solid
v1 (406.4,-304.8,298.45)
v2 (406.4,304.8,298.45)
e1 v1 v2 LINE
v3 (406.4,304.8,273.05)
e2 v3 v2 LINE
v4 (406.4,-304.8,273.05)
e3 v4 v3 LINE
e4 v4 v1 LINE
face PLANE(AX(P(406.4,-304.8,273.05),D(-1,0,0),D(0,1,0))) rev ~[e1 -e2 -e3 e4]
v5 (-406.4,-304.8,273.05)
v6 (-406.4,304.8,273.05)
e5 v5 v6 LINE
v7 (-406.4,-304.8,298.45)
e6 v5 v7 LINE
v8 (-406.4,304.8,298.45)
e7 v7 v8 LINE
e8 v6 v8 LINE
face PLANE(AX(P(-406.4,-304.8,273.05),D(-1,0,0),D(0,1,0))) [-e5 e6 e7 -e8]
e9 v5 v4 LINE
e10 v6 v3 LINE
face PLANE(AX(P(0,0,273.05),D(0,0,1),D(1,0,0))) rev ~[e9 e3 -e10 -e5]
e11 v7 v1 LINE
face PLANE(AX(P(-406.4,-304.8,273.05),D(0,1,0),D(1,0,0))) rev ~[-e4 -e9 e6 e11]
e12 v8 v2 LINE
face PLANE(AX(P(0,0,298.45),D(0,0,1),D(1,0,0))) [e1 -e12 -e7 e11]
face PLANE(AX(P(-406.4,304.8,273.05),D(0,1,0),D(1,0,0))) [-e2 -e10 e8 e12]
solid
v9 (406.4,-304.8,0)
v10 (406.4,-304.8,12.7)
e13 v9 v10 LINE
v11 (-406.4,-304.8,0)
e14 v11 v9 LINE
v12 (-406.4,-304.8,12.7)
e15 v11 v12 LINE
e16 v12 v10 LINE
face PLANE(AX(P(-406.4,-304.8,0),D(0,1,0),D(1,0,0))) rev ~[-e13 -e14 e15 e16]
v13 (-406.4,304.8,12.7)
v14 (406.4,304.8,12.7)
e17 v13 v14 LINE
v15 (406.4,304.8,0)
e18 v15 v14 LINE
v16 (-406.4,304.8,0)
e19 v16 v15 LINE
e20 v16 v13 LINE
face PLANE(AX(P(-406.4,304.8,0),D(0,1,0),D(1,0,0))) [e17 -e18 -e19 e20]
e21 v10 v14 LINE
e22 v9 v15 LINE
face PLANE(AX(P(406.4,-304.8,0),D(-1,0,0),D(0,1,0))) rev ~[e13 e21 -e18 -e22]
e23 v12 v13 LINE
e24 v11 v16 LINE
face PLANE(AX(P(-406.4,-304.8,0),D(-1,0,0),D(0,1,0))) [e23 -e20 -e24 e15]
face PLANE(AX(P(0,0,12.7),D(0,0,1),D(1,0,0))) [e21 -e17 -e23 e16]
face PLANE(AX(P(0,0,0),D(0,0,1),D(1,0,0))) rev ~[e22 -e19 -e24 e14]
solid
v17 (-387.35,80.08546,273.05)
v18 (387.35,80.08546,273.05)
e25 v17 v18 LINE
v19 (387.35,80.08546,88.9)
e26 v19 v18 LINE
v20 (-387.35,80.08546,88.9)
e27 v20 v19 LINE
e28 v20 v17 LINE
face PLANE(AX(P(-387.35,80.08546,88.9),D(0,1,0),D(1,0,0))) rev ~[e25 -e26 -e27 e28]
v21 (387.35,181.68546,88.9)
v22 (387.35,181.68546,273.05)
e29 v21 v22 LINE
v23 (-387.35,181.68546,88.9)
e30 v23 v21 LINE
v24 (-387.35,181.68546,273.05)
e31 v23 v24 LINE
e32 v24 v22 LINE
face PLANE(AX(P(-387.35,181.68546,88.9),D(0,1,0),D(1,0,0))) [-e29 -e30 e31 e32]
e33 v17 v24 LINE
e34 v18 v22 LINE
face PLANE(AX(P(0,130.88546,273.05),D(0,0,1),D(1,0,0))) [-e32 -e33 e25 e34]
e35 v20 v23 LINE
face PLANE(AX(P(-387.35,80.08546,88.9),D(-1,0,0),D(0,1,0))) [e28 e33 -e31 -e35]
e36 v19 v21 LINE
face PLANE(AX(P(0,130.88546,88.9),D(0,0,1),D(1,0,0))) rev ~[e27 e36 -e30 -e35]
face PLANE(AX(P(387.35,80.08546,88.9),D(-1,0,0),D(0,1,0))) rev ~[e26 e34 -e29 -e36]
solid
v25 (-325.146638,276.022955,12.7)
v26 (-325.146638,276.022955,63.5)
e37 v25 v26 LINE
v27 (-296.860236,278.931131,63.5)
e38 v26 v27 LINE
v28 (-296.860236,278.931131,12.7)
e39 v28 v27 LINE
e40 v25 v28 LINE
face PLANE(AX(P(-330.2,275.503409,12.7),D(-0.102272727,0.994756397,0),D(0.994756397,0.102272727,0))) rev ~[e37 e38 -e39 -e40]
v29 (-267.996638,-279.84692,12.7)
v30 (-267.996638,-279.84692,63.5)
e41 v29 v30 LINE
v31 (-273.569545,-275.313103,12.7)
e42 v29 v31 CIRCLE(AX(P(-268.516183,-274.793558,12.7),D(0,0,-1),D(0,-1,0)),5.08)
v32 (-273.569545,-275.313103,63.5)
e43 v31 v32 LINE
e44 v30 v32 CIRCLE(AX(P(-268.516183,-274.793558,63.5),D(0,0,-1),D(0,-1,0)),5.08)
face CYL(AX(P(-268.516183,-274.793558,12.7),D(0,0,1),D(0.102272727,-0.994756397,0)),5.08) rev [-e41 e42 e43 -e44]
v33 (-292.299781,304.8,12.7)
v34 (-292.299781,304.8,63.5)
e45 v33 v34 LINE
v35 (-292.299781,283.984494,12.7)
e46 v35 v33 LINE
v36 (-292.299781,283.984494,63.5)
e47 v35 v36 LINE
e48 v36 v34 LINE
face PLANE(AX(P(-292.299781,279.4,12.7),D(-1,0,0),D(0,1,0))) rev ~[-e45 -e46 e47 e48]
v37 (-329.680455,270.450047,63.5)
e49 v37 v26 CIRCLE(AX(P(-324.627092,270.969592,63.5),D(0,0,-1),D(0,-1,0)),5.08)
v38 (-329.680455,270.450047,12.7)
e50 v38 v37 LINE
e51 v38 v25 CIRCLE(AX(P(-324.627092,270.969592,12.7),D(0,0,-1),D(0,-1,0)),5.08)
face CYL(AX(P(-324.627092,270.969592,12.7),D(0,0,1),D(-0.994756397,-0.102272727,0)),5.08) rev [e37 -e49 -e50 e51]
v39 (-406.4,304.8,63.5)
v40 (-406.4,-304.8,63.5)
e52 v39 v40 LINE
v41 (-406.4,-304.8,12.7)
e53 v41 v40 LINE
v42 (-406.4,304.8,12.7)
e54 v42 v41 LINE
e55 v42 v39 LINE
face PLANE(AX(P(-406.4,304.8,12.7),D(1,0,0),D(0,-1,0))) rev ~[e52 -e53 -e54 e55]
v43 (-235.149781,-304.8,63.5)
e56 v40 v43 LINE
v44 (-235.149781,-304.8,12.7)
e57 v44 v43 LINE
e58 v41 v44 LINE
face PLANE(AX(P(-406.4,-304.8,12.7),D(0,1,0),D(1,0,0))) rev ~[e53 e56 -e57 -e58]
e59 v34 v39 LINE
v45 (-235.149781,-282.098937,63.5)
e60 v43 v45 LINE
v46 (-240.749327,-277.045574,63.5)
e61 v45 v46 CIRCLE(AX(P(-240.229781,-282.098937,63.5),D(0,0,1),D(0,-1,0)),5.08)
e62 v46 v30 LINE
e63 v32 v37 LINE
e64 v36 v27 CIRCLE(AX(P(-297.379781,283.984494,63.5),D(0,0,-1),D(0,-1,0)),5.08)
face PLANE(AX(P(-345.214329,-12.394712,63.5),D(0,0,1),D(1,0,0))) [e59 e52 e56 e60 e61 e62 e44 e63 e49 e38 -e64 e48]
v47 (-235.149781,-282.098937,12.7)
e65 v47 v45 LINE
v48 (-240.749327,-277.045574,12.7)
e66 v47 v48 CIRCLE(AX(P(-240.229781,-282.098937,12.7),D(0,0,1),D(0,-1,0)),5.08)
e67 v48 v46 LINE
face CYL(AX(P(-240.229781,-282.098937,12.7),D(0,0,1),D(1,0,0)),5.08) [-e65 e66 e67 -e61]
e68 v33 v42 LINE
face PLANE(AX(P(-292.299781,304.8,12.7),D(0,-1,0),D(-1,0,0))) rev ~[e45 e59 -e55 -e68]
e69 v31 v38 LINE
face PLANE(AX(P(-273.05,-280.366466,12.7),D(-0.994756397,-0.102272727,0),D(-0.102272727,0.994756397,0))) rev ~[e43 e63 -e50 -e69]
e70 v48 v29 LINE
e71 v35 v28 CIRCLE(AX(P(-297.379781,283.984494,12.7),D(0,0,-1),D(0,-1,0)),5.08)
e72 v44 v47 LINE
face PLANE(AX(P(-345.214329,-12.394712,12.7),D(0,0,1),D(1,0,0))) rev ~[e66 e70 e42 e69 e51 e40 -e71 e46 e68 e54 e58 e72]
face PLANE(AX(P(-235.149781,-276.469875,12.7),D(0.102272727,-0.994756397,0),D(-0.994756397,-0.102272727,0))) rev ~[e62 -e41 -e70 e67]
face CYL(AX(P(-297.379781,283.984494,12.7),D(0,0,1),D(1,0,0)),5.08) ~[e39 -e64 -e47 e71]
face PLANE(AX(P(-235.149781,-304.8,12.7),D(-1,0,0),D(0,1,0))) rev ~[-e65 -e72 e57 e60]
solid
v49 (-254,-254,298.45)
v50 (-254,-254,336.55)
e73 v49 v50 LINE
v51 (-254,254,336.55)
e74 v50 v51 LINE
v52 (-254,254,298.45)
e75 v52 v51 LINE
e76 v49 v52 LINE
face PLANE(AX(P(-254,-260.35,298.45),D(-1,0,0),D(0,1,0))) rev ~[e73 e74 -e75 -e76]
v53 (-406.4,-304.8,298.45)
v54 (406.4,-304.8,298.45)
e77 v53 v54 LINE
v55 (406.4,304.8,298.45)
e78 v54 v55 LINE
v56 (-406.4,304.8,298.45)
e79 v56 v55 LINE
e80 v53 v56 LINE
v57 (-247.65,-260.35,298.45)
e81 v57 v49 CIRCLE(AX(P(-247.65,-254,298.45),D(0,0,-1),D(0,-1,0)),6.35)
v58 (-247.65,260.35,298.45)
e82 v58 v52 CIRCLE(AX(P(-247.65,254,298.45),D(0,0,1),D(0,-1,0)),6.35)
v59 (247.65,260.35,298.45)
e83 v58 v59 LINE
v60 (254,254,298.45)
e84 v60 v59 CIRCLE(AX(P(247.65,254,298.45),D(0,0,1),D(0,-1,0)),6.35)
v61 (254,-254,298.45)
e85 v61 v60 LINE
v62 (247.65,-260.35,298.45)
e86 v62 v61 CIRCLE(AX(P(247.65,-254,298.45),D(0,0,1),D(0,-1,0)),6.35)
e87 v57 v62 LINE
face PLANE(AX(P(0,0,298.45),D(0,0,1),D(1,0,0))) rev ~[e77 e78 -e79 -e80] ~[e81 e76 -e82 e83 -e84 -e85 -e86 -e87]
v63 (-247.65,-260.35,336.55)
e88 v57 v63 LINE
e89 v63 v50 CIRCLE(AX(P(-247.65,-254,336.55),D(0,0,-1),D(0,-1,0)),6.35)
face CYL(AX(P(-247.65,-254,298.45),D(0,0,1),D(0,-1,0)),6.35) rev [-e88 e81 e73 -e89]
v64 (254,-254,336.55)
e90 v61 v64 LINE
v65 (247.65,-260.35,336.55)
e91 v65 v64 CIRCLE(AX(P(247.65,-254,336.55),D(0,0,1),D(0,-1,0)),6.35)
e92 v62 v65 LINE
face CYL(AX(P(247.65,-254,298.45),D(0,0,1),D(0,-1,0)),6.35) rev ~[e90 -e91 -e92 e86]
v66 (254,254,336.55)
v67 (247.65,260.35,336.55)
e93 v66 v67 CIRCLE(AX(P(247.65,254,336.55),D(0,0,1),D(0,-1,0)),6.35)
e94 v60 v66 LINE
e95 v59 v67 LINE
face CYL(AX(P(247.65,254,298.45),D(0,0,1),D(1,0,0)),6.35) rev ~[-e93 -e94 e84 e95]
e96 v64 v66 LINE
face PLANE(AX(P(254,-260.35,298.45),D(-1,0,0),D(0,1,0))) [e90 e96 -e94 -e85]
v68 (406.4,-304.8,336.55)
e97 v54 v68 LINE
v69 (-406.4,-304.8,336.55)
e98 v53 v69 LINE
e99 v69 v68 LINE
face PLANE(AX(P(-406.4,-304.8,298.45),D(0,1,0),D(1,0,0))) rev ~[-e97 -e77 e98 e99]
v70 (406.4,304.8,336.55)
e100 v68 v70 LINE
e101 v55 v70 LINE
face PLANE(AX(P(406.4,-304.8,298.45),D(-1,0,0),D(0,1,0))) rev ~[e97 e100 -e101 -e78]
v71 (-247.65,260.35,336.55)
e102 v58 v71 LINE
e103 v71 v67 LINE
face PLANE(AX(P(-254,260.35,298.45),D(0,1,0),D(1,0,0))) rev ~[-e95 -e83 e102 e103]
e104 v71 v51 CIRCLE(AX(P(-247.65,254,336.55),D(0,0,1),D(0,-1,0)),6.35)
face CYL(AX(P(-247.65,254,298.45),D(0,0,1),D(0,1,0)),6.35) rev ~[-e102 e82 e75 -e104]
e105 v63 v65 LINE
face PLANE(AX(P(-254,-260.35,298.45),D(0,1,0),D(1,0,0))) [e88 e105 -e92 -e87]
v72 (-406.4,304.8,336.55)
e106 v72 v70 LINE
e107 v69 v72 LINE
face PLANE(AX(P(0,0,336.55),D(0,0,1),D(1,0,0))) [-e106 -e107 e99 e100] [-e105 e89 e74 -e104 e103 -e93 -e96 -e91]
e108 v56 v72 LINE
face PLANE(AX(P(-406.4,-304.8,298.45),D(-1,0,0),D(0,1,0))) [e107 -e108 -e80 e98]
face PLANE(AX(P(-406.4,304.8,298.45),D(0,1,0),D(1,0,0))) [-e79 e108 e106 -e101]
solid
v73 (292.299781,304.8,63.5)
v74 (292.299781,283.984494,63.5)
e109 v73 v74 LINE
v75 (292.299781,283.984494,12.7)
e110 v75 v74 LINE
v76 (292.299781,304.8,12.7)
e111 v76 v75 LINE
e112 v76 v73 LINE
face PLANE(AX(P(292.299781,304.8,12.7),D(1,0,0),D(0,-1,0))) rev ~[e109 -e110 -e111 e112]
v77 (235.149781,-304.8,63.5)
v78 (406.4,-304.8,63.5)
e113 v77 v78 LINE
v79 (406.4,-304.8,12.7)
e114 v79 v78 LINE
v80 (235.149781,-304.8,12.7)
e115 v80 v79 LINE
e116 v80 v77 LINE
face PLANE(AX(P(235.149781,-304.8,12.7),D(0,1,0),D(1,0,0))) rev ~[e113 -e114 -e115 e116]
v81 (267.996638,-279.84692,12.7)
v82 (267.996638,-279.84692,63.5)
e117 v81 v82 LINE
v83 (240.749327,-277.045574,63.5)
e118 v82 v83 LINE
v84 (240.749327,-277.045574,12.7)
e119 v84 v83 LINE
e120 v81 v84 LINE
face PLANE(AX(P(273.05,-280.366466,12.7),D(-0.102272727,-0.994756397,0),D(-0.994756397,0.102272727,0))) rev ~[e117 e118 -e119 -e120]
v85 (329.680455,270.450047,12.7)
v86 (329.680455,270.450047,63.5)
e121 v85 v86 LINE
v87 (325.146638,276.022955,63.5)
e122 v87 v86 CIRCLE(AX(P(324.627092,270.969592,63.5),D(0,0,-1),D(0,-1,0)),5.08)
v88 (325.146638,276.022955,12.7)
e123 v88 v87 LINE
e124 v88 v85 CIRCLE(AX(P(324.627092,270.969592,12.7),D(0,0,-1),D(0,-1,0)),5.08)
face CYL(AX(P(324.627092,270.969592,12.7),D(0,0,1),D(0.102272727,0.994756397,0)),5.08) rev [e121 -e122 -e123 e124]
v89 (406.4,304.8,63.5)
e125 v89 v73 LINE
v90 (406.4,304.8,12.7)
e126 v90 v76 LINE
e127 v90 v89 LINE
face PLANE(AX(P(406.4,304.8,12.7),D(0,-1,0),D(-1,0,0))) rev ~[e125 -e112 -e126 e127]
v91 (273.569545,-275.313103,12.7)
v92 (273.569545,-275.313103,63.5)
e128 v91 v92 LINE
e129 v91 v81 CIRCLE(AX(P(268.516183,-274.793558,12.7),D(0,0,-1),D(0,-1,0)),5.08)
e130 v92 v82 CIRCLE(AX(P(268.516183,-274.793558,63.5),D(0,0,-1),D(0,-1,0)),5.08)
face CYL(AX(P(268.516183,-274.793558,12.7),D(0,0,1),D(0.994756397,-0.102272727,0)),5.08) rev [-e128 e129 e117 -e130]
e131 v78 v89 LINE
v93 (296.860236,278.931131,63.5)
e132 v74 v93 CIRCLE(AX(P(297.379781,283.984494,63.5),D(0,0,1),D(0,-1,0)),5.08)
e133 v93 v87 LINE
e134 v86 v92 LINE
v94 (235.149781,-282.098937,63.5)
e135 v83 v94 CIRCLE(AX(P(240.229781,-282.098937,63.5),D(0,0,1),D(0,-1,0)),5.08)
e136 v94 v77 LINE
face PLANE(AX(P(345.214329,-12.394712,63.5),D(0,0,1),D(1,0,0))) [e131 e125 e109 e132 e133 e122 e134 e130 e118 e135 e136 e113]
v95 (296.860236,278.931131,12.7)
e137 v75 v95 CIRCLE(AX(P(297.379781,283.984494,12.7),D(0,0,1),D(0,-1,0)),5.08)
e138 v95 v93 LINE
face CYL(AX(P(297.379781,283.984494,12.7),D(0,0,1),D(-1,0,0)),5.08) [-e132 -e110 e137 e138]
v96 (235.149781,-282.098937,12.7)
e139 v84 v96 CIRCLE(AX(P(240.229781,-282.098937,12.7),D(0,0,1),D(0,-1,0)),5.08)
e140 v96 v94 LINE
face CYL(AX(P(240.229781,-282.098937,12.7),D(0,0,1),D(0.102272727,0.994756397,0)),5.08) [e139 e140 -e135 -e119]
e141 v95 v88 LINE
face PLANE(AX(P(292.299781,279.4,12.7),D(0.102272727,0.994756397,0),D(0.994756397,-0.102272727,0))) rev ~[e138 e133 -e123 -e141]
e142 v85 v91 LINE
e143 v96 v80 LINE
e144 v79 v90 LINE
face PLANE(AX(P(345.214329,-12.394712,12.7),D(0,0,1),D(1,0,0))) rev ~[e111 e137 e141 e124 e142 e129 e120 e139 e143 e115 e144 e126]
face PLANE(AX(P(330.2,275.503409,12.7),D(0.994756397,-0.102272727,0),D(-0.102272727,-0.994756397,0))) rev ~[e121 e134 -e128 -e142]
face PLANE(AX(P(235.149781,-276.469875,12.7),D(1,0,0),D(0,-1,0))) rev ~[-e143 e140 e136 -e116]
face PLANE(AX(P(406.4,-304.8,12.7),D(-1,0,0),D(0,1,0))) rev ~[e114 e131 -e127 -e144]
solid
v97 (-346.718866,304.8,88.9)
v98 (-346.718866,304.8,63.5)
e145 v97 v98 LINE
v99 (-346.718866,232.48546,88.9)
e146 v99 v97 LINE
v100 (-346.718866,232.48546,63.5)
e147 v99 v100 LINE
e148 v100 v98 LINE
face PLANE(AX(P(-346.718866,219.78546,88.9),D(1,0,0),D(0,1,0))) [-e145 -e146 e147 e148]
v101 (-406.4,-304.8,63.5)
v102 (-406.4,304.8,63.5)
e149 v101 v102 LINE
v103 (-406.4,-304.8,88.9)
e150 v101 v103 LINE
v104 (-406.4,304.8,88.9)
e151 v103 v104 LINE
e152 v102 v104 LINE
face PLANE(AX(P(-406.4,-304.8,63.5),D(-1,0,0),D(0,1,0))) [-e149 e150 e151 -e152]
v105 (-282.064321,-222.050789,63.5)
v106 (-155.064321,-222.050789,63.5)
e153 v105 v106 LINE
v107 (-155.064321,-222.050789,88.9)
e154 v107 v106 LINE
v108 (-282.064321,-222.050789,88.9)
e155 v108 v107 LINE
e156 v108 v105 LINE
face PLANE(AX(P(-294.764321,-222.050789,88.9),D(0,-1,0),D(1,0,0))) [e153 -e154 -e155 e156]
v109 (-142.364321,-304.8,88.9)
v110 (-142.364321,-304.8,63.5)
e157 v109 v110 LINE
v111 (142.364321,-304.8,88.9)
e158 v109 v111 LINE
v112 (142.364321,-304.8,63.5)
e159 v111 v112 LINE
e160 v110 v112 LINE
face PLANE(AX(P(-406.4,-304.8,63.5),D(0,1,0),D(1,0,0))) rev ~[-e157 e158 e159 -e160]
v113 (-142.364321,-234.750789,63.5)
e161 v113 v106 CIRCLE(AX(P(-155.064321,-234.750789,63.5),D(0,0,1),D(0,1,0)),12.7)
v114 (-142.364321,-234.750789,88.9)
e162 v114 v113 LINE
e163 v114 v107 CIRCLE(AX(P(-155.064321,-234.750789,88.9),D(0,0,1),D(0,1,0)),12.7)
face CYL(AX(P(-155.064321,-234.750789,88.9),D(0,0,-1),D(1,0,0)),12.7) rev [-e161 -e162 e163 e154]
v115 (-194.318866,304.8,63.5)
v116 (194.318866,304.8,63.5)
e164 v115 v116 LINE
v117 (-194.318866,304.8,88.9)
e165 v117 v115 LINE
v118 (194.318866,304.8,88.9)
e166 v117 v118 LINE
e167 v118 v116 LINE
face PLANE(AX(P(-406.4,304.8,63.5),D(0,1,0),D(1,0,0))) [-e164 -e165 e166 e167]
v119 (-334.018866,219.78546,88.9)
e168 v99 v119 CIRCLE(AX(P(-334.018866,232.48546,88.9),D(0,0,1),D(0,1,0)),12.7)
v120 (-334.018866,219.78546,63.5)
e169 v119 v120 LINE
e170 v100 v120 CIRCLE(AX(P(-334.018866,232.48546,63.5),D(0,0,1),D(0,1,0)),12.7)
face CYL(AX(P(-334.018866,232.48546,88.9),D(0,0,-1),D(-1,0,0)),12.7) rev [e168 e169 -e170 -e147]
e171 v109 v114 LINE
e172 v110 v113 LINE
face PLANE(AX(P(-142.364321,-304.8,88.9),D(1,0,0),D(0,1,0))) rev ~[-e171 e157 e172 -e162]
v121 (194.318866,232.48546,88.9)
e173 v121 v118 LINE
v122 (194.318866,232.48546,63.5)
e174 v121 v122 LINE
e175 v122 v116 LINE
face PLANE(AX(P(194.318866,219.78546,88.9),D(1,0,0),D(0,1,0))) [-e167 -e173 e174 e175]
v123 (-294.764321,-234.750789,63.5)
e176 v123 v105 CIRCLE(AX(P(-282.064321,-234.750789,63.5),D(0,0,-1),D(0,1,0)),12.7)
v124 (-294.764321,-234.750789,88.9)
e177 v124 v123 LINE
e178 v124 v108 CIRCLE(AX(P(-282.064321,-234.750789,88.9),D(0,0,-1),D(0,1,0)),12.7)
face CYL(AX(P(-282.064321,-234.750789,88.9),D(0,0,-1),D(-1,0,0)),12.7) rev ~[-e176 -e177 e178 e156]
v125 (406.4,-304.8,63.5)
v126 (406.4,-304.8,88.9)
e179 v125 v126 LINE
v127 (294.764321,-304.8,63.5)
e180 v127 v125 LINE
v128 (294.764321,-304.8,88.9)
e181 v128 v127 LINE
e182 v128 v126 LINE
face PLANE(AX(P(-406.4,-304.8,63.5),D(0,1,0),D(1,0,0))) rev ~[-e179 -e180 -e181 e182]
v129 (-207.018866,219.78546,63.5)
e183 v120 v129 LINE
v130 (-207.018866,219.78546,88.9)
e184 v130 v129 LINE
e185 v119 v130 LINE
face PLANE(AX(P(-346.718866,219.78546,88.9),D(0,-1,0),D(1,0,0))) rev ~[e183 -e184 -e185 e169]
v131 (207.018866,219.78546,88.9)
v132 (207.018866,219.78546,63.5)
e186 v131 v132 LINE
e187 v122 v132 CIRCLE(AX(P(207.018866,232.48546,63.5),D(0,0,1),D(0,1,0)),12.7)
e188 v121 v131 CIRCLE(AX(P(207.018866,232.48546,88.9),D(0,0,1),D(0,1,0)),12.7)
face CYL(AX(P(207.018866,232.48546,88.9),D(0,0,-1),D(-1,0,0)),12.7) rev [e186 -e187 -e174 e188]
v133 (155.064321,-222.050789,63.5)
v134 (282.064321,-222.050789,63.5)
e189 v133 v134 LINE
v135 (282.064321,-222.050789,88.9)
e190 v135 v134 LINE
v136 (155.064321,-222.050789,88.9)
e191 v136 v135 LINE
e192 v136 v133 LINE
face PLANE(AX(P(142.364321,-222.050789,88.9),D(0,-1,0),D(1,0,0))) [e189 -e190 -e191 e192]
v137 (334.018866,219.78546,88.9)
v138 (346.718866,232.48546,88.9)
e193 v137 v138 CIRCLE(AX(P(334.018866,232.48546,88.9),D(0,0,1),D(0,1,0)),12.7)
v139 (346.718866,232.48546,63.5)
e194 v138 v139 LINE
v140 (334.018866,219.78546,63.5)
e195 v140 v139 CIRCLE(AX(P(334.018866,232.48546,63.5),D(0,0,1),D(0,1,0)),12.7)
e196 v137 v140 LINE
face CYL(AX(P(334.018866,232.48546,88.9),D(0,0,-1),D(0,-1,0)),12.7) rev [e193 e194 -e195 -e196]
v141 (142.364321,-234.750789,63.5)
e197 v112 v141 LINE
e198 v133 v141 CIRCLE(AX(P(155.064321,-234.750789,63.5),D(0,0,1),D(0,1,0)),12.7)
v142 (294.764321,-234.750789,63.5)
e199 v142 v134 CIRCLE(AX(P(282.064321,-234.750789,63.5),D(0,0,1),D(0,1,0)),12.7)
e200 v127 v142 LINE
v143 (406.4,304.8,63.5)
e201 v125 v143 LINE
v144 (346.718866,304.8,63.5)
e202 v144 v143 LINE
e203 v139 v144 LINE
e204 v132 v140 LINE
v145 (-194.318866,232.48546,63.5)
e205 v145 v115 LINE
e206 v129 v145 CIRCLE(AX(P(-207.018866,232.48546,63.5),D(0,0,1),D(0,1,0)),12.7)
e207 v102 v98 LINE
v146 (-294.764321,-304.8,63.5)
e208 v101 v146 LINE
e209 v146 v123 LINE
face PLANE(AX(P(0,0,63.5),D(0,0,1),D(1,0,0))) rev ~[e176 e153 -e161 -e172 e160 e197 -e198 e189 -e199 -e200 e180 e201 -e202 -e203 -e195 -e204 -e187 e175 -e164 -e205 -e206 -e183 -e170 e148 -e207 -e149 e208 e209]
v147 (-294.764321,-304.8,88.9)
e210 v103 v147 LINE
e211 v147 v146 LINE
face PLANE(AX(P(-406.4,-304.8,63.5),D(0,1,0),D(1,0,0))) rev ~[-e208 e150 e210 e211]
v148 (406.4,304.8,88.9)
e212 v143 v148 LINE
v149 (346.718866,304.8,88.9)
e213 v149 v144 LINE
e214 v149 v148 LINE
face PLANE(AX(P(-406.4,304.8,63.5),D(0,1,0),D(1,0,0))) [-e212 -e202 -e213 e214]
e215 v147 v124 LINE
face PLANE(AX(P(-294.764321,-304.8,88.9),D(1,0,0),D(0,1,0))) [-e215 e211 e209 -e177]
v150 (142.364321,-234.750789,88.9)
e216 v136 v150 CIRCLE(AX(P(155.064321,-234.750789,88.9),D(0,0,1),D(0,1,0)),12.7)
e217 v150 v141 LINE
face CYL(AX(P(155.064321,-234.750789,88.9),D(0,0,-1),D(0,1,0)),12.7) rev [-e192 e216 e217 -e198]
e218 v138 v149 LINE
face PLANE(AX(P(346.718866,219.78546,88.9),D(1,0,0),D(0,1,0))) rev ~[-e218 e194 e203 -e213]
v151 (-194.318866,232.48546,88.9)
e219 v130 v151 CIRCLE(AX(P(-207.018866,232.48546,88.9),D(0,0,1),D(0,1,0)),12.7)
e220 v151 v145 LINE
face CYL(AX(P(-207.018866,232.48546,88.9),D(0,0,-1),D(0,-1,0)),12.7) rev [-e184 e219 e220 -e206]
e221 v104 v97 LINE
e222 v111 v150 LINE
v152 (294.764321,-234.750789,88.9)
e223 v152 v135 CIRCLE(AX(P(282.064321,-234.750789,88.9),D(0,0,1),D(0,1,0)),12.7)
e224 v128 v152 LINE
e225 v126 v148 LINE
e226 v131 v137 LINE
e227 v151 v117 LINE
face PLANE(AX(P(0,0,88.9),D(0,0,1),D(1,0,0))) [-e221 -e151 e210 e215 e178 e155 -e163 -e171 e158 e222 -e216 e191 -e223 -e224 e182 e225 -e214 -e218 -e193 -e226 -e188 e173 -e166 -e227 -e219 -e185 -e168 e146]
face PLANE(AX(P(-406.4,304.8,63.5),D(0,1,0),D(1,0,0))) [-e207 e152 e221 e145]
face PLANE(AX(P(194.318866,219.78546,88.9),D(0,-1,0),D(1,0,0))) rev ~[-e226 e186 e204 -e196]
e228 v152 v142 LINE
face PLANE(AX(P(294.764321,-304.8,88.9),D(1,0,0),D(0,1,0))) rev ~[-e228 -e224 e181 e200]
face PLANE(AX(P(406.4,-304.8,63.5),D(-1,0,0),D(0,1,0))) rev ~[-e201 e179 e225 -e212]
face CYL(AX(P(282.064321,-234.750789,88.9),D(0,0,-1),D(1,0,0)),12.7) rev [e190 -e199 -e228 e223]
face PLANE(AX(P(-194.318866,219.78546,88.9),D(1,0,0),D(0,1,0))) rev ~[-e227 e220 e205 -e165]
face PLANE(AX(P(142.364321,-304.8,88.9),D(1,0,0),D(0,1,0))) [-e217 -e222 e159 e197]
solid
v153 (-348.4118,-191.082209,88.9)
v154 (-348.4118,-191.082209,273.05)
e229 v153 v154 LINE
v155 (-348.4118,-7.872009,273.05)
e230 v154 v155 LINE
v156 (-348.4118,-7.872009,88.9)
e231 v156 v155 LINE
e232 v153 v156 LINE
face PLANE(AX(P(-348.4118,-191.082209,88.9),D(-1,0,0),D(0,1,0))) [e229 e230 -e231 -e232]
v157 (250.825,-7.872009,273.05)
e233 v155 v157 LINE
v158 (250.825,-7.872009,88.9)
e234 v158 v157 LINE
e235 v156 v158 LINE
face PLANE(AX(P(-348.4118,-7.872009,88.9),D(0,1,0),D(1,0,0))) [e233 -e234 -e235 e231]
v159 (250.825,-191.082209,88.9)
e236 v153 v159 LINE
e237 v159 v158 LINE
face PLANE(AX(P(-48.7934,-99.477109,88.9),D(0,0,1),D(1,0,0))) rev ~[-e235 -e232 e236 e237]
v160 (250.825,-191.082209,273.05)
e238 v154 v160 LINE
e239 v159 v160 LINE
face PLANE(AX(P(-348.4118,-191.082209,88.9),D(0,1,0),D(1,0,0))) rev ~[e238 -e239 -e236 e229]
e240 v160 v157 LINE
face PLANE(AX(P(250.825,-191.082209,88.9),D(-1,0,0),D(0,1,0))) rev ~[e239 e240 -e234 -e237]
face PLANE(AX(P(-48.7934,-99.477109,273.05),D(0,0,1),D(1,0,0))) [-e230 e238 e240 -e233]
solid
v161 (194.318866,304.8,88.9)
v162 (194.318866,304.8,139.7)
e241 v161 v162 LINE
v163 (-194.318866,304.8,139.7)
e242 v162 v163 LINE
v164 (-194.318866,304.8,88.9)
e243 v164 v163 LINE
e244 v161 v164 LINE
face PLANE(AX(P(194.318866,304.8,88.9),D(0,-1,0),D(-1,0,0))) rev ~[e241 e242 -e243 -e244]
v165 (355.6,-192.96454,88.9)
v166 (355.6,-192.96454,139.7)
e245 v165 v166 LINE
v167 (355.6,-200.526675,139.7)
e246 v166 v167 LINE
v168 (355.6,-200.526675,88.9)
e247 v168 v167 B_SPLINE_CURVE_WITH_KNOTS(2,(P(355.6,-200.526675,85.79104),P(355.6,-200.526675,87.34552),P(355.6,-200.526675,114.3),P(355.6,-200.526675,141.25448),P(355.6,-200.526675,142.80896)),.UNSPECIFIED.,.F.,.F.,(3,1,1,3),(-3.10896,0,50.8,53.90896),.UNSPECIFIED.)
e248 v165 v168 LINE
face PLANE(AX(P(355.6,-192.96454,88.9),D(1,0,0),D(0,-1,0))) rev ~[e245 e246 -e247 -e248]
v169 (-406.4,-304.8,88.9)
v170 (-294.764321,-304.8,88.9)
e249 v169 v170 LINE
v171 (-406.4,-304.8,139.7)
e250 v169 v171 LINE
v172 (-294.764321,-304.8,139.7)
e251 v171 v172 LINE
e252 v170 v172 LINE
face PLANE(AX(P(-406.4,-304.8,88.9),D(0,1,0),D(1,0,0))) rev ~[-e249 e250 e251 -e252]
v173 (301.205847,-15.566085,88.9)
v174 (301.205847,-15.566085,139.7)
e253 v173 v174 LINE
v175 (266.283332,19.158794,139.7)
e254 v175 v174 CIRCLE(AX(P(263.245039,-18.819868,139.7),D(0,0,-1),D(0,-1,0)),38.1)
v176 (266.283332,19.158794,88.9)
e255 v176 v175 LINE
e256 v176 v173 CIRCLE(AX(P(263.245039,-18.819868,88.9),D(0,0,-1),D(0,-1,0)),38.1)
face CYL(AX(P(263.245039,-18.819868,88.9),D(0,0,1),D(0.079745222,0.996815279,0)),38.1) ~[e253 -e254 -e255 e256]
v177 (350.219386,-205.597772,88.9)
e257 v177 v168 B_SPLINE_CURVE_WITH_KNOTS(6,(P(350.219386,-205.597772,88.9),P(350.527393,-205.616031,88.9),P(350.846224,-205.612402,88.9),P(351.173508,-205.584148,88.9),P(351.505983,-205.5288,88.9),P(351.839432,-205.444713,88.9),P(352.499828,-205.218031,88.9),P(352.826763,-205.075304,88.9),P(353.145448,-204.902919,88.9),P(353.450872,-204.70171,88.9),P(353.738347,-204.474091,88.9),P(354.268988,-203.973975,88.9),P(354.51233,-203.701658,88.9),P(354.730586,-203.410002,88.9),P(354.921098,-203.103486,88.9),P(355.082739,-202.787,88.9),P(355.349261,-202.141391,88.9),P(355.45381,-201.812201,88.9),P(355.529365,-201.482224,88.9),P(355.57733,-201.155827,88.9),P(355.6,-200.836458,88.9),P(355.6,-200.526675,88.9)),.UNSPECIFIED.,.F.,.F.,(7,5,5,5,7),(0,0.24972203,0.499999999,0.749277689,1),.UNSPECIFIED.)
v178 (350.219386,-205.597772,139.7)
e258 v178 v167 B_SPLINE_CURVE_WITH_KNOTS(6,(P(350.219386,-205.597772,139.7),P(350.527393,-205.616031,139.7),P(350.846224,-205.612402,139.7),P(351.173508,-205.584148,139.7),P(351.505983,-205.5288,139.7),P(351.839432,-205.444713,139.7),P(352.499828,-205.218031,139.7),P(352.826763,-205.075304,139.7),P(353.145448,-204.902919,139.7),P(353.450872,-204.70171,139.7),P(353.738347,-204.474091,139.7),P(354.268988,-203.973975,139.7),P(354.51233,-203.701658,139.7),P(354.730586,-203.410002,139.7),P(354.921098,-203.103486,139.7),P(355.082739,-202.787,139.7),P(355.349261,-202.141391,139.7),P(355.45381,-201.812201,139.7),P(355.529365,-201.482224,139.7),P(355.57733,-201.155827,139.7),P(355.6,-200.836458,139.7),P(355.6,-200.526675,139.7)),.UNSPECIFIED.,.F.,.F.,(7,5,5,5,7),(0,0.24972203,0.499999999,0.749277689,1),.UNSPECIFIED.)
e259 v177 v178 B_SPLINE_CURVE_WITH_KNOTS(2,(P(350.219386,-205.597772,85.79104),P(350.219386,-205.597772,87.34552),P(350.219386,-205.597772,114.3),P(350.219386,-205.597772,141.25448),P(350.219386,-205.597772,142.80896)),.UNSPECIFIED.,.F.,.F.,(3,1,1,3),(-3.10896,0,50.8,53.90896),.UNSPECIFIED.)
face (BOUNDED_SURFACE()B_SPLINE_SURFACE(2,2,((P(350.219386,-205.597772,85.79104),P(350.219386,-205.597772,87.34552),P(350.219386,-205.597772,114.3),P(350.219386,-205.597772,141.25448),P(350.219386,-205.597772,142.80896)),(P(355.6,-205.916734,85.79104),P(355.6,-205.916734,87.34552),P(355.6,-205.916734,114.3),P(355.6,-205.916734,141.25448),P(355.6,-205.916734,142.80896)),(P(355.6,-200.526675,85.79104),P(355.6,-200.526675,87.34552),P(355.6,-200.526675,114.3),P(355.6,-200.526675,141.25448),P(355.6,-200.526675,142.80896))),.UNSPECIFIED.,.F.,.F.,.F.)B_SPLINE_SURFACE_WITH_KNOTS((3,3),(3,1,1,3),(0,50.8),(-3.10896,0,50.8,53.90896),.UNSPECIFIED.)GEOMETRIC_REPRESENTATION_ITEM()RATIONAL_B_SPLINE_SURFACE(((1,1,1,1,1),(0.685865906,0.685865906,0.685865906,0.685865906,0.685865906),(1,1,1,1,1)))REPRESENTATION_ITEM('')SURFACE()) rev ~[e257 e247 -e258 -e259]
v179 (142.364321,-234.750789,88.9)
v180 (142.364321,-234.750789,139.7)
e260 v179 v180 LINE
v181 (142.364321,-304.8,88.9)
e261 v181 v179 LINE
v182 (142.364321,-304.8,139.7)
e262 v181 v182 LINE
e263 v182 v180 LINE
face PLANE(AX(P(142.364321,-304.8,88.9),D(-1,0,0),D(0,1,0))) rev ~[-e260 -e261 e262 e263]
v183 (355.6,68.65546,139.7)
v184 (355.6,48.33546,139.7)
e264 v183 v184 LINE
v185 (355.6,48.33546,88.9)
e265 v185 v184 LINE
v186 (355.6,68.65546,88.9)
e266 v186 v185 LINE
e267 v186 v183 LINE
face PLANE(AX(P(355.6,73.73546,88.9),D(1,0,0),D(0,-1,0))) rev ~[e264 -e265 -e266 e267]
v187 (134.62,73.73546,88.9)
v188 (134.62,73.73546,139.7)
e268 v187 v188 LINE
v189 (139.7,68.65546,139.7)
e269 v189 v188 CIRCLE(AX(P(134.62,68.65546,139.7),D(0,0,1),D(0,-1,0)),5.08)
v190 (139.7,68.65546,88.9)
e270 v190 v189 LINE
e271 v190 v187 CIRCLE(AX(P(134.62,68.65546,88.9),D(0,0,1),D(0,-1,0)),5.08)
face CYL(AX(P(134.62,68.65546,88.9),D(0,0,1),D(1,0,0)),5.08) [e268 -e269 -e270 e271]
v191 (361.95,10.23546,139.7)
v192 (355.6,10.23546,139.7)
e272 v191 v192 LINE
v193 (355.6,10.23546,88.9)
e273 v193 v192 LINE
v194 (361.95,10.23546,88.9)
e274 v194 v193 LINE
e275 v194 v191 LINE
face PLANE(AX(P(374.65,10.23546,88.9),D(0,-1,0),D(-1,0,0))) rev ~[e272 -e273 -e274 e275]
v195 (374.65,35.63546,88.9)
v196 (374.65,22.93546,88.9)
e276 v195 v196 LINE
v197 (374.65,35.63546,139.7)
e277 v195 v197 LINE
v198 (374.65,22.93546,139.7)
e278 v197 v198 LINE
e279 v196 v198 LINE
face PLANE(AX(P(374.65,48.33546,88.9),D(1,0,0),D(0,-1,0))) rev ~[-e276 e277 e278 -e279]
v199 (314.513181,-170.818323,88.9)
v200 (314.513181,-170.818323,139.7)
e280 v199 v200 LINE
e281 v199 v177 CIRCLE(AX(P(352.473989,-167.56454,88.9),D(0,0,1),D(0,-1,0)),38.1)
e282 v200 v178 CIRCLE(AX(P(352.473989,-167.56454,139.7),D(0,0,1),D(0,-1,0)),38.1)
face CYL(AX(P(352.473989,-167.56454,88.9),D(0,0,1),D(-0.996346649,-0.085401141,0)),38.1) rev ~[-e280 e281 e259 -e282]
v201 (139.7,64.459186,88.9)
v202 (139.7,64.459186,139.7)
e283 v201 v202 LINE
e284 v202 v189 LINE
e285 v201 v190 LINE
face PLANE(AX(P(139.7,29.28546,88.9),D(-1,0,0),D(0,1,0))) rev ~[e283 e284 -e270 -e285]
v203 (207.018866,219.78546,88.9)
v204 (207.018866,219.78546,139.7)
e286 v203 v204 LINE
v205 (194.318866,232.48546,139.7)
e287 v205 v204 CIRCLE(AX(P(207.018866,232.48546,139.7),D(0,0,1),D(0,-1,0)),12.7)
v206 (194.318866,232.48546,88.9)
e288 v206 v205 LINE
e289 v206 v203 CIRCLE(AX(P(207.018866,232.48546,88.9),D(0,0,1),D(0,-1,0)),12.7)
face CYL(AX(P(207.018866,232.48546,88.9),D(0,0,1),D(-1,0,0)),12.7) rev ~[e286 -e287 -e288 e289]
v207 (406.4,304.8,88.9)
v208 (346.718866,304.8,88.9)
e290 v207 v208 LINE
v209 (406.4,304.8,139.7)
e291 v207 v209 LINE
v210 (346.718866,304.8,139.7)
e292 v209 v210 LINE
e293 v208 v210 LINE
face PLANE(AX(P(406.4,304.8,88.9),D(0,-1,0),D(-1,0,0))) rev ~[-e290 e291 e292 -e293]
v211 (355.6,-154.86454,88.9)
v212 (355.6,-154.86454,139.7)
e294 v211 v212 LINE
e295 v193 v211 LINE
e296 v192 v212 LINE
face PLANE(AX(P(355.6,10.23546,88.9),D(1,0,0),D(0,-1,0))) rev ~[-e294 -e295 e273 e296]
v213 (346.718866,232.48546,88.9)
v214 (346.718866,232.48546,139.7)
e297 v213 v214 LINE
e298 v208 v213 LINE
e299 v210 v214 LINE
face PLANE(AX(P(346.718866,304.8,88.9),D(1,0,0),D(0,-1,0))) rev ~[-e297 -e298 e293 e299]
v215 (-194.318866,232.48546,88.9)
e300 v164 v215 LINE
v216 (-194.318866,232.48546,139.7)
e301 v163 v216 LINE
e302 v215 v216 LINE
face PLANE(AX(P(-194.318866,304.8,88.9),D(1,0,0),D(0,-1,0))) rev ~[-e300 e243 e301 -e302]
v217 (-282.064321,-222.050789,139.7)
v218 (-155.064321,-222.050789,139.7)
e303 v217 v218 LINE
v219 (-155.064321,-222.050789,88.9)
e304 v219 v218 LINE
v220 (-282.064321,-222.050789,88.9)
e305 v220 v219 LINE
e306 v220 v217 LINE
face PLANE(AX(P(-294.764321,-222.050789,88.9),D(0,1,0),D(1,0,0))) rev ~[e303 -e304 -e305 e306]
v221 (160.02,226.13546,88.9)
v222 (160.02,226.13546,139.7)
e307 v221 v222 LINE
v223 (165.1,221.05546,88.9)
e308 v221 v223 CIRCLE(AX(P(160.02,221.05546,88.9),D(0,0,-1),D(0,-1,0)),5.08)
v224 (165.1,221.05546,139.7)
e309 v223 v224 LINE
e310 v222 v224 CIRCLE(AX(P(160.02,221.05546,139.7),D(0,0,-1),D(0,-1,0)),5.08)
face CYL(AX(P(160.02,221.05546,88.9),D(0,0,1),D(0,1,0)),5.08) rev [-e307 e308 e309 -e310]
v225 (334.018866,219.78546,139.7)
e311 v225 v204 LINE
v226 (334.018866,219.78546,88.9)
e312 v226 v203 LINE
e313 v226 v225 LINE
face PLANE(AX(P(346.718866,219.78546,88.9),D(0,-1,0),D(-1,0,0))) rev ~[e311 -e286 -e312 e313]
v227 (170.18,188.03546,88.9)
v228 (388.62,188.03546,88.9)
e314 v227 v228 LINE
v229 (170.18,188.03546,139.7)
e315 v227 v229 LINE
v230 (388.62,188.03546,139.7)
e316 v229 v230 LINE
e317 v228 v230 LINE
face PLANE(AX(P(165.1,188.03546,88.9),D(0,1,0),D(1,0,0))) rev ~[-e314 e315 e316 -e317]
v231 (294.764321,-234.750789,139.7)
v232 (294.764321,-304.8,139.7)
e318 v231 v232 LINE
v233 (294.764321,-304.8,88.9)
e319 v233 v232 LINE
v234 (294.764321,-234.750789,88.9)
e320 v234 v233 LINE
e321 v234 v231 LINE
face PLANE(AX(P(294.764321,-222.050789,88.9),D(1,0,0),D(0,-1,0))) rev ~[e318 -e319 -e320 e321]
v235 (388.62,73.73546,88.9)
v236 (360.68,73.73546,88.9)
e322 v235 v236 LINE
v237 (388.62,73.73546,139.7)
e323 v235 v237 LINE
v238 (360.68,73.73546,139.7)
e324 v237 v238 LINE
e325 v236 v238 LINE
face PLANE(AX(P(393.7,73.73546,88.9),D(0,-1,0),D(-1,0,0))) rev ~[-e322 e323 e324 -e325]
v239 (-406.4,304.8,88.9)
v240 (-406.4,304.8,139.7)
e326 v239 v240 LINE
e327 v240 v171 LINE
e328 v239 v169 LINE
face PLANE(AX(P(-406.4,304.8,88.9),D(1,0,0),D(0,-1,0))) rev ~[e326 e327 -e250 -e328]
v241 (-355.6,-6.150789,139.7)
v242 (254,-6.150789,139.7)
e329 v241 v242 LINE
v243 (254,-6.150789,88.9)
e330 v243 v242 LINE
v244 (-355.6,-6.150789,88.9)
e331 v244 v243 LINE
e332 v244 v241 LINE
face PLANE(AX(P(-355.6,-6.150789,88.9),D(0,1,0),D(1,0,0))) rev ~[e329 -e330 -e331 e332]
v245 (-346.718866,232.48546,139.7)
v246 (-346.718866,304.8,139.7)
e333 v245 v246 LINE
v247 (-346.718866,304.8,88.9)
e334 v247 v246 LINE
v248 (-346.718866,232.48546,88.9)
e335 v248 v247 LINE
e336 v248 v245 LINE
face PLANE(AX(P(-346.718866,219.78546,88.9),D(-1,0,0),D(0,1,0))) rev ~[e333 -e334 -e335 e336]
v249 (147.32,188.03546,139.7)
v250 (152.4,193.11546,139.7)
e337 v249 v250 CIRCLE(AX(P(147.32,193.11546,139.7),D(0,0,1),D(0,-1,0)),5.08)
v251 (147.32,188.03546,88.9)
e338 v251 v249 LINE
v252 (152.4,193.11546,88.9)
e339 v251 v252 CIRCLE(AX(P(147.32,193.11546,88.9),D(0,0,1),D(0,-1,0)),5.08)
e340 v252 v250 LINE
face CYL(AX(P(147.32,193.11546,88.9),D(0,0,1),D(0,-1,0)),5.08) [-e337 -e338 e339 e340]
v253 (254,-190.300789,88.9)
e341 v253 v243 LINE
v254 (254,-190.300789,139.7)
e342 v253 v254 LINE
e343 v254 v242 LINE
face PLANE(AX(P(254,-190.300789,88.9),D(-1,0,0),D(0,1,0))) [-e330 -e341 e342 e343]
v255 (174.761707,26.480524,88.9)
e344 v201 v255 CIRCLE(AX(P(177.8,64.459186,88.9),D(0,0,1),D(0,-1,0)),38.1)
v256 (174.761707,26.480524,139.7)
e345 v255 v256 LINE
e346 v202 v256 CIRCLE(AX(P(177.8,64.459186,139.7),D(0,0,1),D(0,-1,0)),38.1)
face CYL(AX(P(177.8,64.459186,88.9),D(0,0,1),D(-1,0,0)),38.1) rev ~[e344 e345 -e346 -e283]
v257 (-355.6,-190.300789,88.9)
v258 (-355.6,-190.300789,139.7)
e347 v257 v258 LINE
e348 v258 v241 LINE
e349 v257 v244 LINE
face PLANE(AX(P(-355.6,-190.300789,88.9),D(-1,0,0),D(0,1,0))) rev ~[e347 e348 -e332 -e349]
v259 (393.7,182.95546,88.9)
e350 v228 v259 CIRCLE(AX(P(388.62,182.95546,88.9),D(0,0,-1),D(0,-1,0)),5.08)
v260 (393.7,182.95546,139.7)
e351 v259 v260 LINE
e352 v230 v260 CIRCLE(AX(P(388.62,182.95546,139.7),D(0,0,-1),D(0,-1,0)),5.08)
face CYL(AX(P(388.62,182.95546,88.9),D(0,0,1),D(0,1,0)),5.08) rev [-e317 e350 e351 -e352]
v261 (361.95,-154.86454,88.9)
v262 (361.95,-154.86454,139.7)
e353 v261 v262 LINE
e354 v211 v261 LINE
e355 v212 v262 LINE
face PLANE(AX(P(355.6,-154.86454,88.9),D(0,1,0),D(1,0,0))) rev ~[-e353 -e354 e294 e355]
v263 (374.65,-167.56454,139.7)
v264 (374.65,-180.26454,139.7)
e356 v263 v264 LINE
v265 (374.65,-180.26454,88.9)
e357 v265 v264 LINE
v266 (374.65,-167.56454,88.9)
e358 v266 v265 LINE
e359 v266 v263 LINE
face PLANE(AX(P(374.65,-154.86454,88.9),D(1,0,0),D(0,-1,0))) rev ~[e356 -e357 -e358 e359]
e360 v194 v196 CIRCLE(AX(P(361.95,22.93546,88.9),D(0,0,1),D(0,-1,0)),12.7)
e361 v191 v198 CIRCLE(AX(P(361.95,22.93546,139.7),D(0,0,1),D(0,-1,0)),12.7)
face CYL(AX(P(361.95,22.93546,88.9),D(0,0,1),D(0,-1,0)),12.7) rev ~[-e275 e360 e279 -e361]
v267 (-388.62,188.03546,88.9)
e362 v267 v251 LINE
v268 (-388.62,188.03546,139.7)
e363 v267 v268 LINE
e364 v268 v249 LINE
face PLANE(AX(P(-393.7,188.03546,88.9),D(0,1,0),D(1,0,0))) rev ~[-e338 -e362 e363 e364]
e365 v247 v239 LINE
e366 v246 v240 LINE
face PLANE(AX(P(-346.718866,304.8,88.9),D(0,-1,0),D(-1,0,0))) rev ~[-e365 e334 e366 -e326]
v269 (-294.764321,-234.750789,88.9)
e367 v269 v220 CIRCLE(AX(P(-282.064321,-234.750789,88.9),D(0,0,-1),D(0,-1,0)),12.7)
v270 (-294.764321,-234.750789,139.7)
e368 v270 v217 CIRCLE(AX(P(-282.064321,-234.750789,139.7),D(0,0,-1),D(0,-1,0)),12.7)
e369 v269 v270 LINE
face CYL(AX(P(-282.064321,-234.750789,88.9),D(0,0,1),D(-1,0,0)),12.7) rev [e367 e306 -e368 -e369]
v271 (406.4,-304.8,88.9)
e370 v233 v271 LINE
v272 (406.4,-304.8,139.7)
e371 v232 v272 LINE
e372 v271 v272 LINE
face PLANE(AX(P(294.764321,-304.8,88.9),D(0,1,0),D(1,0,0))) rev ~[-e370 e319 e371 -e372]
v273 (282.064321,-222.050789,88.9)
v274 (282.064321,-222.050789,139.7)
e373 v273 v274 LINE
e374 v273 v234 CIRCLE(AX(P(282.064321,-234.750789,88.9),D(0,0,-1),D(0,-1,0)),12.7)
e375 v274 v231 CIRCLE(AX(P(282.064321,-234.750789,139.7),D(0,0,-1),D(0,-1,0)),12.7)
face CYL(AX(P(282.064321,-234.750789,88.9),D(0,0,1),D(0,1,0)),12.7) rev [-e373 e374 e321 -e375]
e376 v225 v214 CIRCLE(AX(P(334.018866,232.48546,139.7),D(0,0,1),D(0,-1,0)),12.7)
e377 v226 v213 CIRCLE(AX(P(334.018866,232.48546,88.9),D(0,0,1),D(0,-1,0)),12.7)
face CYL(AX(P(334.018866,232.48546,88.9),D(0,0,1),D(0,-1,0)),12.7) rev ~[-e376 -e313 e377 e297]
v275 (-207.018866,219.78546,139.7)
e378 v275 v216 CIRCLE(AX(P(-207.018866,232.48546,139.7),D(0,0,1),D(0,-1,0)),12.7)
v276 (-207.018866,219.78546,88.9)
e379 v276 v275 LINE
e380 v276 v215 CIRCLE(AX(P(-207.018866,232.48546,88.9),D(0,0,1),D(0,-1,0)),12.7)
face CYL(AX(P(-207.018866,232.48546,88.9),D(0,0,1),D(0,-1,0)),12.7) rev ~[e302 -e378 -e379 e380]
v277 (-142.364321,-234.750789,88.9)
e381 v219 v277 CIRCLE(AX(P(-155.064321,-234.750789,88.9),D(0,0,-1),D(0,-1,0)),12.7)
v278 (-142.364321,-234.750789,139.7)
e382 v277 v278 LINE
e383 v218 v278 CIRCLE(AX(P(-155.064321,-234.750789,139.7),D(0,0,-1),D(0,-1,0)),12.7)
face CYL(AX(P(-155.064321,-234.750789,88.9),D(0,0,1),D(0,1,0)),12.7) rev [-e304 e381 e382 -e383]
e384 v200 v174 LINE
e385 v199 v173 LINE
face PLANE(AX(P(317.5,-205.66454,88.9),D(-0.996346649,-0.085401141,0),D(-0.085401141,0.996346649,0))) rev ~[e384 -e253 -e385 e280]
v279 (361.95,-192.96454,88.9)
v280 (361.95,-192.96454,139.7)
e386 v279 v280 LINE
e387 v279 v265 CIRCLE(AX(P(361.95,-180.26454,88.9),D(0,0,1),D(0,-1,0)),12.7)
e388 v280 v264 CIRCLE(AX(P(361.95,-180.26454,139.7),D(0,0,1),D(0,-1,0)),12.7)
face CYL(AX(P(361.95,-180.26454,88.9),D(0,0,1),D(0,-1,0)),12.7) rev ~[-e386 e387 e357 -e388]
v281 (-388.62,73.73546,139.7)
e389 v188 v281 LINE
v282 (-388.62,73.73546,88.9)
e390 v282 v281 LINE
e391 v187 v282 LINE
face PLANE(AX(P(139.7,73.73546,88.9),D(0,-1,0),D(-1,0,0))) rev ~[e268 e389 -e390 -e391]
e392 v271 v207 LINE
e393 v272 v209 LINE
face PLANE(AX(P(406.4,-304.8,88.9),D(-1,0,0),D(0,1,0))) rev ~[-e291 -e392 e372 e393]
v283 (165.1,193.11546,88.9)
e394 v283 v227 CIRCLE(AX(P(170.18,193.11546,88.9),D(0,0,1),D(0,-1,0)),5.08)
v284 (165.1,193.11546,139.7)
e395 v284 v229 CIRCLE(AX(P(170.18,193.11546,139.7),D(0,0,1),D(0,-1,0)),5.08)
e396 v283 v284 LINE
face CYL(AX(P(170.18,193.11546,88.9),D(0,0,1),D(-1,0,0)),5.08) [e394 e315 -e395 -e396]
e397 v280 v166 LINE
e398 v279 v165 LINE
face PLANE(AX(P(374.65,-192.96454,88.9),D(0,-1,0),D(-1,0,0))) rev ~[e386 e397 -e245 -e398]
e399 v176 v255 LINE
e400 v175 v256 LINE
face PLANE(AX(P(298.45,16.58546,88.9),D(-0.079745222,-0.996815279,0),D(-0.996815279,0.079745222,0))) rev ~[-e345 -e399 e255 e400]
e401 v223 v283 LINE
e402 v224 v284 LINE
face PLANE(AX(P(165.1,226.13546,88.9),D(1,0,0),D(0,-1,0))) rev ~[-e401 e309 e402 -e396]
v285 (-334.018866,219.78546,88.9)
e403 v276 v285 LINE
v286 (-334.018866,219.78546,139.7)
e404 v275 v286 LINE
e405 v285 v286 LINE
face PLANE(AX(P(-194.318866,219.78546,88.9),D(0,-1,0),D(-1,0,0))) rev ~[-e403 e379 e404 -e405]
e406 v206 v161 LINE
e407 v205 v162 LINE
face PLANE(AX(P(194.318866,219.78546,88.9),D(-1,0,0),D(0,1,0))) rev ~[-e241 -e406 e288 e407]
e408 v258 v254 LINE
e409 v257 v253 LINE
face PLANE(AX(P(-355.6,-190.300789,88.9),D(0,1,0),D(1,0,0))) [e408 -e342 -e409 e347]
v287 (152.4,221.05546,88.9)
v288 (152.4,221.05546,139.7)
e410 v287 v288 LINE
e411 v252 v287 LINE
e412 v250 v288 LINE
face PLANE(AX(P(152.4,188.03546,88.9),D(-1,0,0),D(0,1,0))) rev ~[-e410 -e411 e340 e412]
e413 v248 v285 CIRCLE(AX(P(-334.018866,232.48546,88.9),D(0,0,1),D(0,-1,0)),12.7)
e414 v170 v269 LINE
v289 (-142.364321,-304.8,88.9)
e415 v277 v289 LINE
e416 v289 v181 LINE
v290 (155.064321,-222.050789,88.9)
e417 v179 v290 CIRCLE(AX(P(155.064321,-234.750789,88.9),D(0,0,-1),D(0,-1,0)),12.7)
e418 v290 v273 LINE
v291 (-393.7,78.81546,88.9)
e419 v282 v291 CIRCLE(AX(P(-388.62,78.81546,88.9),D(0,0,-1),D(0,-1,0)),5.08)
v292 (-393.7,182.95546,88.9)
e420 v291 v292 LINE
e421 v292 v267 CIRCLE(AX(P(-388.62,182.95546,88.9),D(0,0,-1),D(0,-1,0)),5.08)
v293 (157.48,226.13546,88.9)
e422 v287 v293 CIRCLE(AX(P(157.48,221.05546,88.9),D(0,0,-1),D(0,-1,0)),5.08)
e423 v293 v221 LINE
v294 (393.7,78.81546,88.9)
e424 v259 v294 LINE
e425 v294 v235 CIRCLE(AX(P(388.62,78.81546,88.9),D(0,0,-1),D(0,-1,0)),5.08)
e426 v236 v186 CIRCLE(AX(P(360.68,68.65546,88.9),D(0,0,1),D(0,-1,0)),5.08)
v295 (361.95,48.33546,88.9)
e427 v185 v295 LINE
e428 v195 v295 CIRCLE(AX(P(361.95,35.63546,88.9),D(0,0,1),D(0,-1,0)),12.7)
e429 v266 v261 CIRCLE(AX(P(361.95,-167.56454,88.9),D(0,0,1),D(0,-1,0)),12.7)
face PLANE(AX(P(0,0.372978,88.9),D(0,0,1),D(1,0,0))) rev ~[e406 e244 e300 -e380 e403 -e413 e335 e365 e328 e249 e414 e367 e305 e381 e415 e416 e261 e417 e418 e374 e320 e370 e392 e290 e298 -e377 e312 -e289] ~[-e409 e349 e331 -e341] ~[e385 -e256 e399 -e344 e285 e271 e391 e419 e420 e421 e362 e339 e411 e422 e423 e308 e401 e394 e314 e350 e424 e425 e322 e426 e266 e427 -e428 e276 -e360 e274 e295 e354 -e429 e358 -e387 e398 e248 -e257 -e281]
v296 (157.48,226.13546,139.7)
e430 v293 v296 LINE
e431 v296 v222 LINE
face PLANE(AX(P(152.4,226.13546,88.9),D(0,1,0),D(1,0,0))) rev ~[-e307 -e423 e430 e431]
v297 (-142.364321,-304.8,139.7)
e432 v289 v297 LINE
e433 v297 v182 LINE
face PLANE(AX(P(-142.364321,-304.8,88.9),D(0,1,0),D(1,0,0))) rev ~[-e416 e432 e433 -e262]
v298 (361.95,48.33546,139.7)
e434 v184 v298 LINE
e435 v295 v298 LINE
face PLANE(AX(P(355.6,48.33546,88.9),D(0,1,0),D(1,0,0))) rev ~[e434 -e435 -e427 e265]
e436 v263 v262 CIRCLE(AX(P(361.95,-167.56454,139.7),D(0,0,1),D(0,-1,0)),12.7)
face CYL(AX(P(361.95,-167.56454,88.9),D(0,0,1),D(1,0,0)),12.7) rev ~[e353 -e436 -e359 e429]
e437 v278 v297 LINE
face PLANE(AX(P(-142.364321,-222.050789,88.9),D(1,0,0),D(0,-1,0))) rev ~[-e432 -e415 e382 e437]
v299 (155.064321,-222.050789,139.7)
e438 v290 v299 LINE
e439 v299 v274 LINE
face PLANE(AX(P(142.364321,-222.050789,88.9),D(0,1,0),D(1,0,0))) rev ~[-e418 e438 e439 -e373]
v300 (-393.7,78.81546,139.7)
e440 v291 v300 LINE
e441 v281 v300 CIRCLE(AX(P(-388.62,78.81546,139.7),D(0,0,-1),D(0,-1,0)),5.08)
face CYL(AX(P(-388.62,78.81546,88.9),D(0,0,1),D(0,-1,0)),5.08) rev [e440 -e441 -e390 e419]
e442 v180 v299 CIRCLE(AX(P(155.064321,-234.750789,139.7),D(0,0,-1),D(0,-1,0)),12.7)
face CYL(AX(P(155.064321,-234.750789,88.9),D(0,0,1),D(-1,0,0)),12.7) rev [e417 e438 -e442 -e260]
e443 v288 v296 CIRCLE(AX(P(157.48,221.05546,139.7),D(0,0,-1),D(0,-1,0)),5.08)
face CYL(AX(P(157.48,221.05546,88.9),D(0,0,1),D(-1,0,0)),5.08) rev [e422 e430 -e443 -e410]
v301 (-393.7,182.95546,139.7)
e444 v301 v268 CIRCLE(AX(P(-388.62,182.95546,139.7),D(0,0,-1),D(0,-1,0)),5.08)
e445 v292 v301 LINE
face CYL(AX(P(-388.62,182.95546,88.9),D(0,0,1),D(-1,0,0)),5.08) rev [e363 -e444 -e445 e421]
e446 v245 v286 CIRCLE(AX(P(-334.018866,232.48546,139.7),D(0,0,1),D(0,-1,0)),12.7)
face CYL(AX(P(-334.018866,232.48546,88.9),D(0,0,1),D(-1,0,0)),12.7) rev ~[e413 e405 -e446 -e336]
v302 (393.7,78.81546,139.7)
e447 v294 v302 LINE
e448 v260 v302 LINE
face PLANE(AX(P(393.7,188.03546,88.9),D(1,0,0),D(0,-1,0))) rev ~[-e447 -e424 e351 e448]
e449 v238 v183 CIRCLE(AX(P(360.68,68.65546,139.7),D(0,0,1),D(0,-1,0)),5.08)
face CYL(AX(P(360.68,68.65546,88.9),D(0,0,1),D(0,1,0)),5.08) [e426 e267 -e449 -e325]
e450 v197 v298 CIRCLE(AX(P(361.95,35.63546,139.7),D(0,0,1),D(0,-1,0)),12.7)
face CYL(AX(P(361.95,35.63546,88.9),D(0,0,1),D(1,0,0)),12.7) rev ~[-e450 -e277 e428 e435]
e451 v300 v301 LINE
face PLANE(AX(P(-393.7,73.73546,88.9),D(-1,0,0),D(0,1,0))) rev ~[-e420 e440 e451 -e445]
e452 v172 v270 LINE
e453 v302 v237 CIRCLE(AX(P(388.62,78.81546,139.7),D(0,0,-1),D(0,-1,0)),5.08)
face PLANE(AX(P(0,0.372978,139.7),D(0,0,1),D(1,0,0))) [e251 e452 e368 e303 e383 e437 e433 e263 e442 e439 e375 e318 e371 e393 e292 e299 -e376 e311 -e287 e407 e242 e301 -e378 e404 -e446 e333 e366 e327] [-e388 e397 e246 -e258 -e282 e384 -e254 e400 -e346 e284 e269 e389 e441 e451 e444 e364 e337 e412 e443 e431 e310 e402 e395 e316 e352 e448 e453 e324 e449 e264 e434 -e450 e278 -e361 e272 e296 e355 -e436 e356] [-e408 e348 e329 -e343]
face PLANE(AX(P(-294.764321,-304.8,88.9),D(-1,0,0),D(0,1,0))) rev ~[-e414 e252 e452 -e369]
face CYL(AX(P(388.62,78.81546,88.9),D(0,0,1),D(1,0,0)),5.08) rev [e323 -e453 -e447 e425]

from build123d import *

# Parameters (mm, degrees)
F0_W      = 812.8
F0_H      = 609.6
F1_DEPTH  = 12.7
F3_DEPTH  = 50.8
F5_W      = 812.8
F5_H      = 609.6
F6_DEPTH  = 25.4
F7_W      = 152.4
F7_H      = 82.7492105986
F7_H_2    = 85.014539755
F8_DEPTH  = 25.4
F9_W      = 609.6
F9_H      = 184.15
F10_DEPTH = 50.8
F12_W     = 812.8
F12_H     = 609.6
F13_DEPTH = 25.4
F14_W     = 812.8
F14_H     = 609.6
F14_W_2   = 508
F14_H_2   = 520.7
F15_DEPTH = 38.1
F16_R     = 38.1
F17_R     = 5.08
F18_W     = 774.7
F18_H     = 101.6
F19_DEPTH = 184.15
F18_W_2   = 599.2368
F18_H_2   = 183.2102
F20_R     = 6.35
F21_R     = 12.7
F21_2_R   = 12.7
F22_R     = 5.08
F22_2_R   = 5.08


# Not quite as in the source:
# - a feature names something its author has since deleted; it is built from what else it names


with BuildPart() as f1:
    # F0 (on Top) → F1 (new body)
    with BuildSketch(Plane.XY):
        Rectangle(F0_W, F0_H)
    extrude(amount=F1_DEPTH)


with BuildPart() as f3:
    # F2 (on face) → F3 (new body)
    with BuildSketch(Plane.XY.offset(12.7)):
        Polygon((-292.2997812765, 279.4), (-292.2997812765, 304.8), (-406.4, 304.8), (-406.4, -304.8), (-235.1497812765, -304.8), (-235.1497812765, -276.469874611), (-273.05, -280.36646552), (-330.2, 275.5034090909), align=None)
    extrude(amount=F3_DEPTH)

    # F22
    f22_edges = [f3.edges().sort_by_distance(p)[0] for p in [
        (-330.2, 275.503409, 38.1),
        (-292.299781, 279.4, 38.1),
        (-273.05, -280.366466, 38.1),
        (-235.149781, -276.469875, 38.1),
    ]]
    fillet(f22_edges, radius=F22_R)


with BuildPart() as f3b:
    # F2 (on face) → F3, piece 2 (new body)
    with BuildSketch(Plane.XY.offset(12.7)):
        Polygon((406.4, 304.8), (292.2997812765, 304.8), (292.2997812765, 279.4), (330.2, 275.5034090909), (273.05, -280.36646552), (235.1497812765, -276.469874611), (235.1497812765, -304.8), (406.4, -304.8), align=None)
    extrude(amount=F3_DEPTH)

    # F22#2
    f22_2_edges = [f3b.edges().sort_by_distance(p)[0] for p in [
        (330.2, 275.503409, 38.1),
        (292.299781, 279.4, 38.1),
        (273.05, -280.366466, 38.1),
        (235.149781, -276.469875, 38.1),
    ]]
    fillet(f22_2_edges, radius=F22_2_R)


with BuildPart() as f6:
    # F5 (on offset) → F6 (new body)
    with BuildSketch(Plane.XY.offset(63.5)):
        Rectangle(F5_W, F5_H)
    extrude(amount=F6_DEPTH)

    # F7 (on face) → F8 (cut)
    with BuildSketch(Plane.XY.offset(88.9)):
        with Locations((-218.5643210316, -263.4253947007)):
            Rectangle(F7_W, F7_H)
        with Locations((218.5643210316, -263.4253947007)):
            Rectangle(F7_W, F7_H)
        with Locations((-270.5188664861, 262.2927301225)):
            Rectangle(F7_W, F7_H_2)
        with Locations((270.5188664861, 262.2927301225)):
            Rectangle(F7_W, F7_H_2)
    extrude(amount=-F8_DEPTH, mode=Mode.SUBTRACT)

    # F21
    f21_edges = [f6.edges().sort_by_distance(p)[0] for p in [
        (-294.764321, -222.050789, 76.2),
        (-142.364321, -222.050789, 76.2),
        (294.764321, -222.050789, 76.2),
        (142.364321, -222.050789, 76.2),
        (346.718866, 219.78546, 76.2),
        (-346.718866, 219.78546, 76.2),
        (-194.318866, 219.78546, 76.2),
        (194.318866, 219.78546, 76.2),
    ]]
    fillet(f21_edges, radius=F21_R)


with BuildPart() as f10:
    # F9 (on face) → F10 (new body)
    with BuildSketch(Plane.XY.offset(88.9)):
        Polygon((-406.4, 304.8), (-406.4, -304.8), (-294.7643210316, -304.8), (-294.7643210316, -222.0507894014), (-142.3643210316, -222.0507894014), (-142.3643210316, -304.8), (142.3643210316, -304.8), (142.3643210316, -222.0507894014), (294.7643210316, -222.0507894014), (294.7643210316, -304.8), (406.4, -304.8), (406.4, 304.8), (346.7188664861, 304.8), (346.7188664861, 219.785460245), (194.3188664861, 219.785460245), (194.3188664861, 304.8), (-194.3188664861, 304.8), (-194.3188664861, 219.785460245), (-346.7188664861, 219.785460245), (-346.7188664861, 304.8), align=None)
        with Locations((-50.8, -98.2257894014)):
            Rectangle(F9_W, F9_H, mode=Mode.SUBTRACT)
        Polygon((-393.7, 73.735460245), (-393.7, 188.035460245), (152.4, 188.035460245), (152.4, 226.135460245), (165.1, 226.135460245), (165.1, 188.035460245), (393.7, 188.035460245), (393.7, 73.735460245), (355.6, 73.735460245), (355.6, 48.335460245), (374.65, 48.335460245), (374.65, 10.235460245), (355.6, 10.235460245), (355.6, -154.864539755), (374.65, -154.864539755), (374.65, -192.964539755), (355.6, -192.964539755), (355.6, -205.664539755), (317.5, -205.664539755), (298.45, 16.585460245), (139.7, 29.285460245), (139.7, 73.735460245), align=None, mode=Mode.SUBTRACT)
    extrude(amount=F10_DEPTH)

    # F16
    f16_edges = [f10.edges().sort_by_distance(p)[0] for p in [
        (139.7, 29.28546, 114.3),
        (298.45, 16.58546, 114.3),
        (317.5, -205.66454, 114.3),
    ]]
    fillet(f16_edges, radius=F16_R)

    # F17
    f17_edges = [f10.edges().sort_by_distance(p)[0] for p in [
        (139.7, 73.73546, 114.3),
        (152.4, 188.03546, 114.3),
        (165.1, 188.03546, 114.3),
        (393.7, 188.03546, 114.3),
        (393.7, 73.73546, 114.3),
        (355.6, 73.73546, 114.3),
        (355.6, -205.66454, 114.3),
        (-393.7, 188.03546, 114.3),
        (-393.7, 73.73546, 114.3),
        (165.1, 226.13546, 114.3),
        (152.4, 226.13546, 114.3),
    ]]
    fillet(f17_edges, radius=F17_R)

    # F21#2
    f21_2_edges = [f10.edges().sort_by_distance(p)[0] for p in [
        (-294.764321, -222.050789, 114.3),
        (-142.364321, -222.050789, 114.3),
        (294.764321, -222.050789, 114.3),
        (142.364321, -222.050789, 114.3),
        (-194.318866, 219.78546, 114.3),
        (194.318866, 219.78546, 114.3),
        (346.718866, 219.78546, 114.3),
        (-346.718866, 219.78546, 114.3),
        (374.65, 48.33546, 114.3),
        (374.65, -154.86454, 114.3),
        (374.65, 10.23546, 114.3),
        (374.65, -192.96454, 114.3),
    ]]
    fillet(f21_2_edges, radius=F21_2_R)


with BuildPart() as f13:
    # F12 (on offset) → F13 (new body)
    with BuildSketch(Plane.XY.offset(273.05)):
        Rectangle(F12_W, F12_H)
    extrude(amount=F13_DEPTH)


with BuildPart() as f15:
    # F14 (on face) → F15 (new body)
    with BuildSketch(Plane.XY.offset(298.45)):
        Rectangle(F14_W, F14_H)
        Rectangle(F14_W_2, F14_H_2, mode=Mode.SUBTRACT)
    extrude(amount=F15_DEPTH)

    # F20
    f20_edges = [f15.edges().sort_by_distance(p)[0] for p in [
        (-254, 260.35, 317.5),
        (254, 260.35, 317.5),
        (-254, -260.35, 317.5),
        (254, -260.35, 317.5),
    ]]
    fillet(f20_edges, radius=F20_R)


with BuildPart() as f19:
    # F18 (on face) → F19 (new body)
    with BuildSketch(Plane.XY.offset(88.9)):
        with Locations((0, 130.885460245)):
            Rectangle(F18_W, F18_H)
    extrude(amount=F19_DEPTH)


with BuildPart() as f19b:
    # F18 (on face) → F19, piece 2 (new body)
    with BuildSketch(Plane.XY.offset(88.9)):
        with Locations((-48.7934, -99.4771093487)):
            Rectangle(F18_W_2, F18_H_2)
    extrude(amount=F19_DEPTH)


solid = Compound([f1.part, f3.part, f3b.part, f6.part, f10.part, f13.part, f15.part, f19.part, f19b.part])
